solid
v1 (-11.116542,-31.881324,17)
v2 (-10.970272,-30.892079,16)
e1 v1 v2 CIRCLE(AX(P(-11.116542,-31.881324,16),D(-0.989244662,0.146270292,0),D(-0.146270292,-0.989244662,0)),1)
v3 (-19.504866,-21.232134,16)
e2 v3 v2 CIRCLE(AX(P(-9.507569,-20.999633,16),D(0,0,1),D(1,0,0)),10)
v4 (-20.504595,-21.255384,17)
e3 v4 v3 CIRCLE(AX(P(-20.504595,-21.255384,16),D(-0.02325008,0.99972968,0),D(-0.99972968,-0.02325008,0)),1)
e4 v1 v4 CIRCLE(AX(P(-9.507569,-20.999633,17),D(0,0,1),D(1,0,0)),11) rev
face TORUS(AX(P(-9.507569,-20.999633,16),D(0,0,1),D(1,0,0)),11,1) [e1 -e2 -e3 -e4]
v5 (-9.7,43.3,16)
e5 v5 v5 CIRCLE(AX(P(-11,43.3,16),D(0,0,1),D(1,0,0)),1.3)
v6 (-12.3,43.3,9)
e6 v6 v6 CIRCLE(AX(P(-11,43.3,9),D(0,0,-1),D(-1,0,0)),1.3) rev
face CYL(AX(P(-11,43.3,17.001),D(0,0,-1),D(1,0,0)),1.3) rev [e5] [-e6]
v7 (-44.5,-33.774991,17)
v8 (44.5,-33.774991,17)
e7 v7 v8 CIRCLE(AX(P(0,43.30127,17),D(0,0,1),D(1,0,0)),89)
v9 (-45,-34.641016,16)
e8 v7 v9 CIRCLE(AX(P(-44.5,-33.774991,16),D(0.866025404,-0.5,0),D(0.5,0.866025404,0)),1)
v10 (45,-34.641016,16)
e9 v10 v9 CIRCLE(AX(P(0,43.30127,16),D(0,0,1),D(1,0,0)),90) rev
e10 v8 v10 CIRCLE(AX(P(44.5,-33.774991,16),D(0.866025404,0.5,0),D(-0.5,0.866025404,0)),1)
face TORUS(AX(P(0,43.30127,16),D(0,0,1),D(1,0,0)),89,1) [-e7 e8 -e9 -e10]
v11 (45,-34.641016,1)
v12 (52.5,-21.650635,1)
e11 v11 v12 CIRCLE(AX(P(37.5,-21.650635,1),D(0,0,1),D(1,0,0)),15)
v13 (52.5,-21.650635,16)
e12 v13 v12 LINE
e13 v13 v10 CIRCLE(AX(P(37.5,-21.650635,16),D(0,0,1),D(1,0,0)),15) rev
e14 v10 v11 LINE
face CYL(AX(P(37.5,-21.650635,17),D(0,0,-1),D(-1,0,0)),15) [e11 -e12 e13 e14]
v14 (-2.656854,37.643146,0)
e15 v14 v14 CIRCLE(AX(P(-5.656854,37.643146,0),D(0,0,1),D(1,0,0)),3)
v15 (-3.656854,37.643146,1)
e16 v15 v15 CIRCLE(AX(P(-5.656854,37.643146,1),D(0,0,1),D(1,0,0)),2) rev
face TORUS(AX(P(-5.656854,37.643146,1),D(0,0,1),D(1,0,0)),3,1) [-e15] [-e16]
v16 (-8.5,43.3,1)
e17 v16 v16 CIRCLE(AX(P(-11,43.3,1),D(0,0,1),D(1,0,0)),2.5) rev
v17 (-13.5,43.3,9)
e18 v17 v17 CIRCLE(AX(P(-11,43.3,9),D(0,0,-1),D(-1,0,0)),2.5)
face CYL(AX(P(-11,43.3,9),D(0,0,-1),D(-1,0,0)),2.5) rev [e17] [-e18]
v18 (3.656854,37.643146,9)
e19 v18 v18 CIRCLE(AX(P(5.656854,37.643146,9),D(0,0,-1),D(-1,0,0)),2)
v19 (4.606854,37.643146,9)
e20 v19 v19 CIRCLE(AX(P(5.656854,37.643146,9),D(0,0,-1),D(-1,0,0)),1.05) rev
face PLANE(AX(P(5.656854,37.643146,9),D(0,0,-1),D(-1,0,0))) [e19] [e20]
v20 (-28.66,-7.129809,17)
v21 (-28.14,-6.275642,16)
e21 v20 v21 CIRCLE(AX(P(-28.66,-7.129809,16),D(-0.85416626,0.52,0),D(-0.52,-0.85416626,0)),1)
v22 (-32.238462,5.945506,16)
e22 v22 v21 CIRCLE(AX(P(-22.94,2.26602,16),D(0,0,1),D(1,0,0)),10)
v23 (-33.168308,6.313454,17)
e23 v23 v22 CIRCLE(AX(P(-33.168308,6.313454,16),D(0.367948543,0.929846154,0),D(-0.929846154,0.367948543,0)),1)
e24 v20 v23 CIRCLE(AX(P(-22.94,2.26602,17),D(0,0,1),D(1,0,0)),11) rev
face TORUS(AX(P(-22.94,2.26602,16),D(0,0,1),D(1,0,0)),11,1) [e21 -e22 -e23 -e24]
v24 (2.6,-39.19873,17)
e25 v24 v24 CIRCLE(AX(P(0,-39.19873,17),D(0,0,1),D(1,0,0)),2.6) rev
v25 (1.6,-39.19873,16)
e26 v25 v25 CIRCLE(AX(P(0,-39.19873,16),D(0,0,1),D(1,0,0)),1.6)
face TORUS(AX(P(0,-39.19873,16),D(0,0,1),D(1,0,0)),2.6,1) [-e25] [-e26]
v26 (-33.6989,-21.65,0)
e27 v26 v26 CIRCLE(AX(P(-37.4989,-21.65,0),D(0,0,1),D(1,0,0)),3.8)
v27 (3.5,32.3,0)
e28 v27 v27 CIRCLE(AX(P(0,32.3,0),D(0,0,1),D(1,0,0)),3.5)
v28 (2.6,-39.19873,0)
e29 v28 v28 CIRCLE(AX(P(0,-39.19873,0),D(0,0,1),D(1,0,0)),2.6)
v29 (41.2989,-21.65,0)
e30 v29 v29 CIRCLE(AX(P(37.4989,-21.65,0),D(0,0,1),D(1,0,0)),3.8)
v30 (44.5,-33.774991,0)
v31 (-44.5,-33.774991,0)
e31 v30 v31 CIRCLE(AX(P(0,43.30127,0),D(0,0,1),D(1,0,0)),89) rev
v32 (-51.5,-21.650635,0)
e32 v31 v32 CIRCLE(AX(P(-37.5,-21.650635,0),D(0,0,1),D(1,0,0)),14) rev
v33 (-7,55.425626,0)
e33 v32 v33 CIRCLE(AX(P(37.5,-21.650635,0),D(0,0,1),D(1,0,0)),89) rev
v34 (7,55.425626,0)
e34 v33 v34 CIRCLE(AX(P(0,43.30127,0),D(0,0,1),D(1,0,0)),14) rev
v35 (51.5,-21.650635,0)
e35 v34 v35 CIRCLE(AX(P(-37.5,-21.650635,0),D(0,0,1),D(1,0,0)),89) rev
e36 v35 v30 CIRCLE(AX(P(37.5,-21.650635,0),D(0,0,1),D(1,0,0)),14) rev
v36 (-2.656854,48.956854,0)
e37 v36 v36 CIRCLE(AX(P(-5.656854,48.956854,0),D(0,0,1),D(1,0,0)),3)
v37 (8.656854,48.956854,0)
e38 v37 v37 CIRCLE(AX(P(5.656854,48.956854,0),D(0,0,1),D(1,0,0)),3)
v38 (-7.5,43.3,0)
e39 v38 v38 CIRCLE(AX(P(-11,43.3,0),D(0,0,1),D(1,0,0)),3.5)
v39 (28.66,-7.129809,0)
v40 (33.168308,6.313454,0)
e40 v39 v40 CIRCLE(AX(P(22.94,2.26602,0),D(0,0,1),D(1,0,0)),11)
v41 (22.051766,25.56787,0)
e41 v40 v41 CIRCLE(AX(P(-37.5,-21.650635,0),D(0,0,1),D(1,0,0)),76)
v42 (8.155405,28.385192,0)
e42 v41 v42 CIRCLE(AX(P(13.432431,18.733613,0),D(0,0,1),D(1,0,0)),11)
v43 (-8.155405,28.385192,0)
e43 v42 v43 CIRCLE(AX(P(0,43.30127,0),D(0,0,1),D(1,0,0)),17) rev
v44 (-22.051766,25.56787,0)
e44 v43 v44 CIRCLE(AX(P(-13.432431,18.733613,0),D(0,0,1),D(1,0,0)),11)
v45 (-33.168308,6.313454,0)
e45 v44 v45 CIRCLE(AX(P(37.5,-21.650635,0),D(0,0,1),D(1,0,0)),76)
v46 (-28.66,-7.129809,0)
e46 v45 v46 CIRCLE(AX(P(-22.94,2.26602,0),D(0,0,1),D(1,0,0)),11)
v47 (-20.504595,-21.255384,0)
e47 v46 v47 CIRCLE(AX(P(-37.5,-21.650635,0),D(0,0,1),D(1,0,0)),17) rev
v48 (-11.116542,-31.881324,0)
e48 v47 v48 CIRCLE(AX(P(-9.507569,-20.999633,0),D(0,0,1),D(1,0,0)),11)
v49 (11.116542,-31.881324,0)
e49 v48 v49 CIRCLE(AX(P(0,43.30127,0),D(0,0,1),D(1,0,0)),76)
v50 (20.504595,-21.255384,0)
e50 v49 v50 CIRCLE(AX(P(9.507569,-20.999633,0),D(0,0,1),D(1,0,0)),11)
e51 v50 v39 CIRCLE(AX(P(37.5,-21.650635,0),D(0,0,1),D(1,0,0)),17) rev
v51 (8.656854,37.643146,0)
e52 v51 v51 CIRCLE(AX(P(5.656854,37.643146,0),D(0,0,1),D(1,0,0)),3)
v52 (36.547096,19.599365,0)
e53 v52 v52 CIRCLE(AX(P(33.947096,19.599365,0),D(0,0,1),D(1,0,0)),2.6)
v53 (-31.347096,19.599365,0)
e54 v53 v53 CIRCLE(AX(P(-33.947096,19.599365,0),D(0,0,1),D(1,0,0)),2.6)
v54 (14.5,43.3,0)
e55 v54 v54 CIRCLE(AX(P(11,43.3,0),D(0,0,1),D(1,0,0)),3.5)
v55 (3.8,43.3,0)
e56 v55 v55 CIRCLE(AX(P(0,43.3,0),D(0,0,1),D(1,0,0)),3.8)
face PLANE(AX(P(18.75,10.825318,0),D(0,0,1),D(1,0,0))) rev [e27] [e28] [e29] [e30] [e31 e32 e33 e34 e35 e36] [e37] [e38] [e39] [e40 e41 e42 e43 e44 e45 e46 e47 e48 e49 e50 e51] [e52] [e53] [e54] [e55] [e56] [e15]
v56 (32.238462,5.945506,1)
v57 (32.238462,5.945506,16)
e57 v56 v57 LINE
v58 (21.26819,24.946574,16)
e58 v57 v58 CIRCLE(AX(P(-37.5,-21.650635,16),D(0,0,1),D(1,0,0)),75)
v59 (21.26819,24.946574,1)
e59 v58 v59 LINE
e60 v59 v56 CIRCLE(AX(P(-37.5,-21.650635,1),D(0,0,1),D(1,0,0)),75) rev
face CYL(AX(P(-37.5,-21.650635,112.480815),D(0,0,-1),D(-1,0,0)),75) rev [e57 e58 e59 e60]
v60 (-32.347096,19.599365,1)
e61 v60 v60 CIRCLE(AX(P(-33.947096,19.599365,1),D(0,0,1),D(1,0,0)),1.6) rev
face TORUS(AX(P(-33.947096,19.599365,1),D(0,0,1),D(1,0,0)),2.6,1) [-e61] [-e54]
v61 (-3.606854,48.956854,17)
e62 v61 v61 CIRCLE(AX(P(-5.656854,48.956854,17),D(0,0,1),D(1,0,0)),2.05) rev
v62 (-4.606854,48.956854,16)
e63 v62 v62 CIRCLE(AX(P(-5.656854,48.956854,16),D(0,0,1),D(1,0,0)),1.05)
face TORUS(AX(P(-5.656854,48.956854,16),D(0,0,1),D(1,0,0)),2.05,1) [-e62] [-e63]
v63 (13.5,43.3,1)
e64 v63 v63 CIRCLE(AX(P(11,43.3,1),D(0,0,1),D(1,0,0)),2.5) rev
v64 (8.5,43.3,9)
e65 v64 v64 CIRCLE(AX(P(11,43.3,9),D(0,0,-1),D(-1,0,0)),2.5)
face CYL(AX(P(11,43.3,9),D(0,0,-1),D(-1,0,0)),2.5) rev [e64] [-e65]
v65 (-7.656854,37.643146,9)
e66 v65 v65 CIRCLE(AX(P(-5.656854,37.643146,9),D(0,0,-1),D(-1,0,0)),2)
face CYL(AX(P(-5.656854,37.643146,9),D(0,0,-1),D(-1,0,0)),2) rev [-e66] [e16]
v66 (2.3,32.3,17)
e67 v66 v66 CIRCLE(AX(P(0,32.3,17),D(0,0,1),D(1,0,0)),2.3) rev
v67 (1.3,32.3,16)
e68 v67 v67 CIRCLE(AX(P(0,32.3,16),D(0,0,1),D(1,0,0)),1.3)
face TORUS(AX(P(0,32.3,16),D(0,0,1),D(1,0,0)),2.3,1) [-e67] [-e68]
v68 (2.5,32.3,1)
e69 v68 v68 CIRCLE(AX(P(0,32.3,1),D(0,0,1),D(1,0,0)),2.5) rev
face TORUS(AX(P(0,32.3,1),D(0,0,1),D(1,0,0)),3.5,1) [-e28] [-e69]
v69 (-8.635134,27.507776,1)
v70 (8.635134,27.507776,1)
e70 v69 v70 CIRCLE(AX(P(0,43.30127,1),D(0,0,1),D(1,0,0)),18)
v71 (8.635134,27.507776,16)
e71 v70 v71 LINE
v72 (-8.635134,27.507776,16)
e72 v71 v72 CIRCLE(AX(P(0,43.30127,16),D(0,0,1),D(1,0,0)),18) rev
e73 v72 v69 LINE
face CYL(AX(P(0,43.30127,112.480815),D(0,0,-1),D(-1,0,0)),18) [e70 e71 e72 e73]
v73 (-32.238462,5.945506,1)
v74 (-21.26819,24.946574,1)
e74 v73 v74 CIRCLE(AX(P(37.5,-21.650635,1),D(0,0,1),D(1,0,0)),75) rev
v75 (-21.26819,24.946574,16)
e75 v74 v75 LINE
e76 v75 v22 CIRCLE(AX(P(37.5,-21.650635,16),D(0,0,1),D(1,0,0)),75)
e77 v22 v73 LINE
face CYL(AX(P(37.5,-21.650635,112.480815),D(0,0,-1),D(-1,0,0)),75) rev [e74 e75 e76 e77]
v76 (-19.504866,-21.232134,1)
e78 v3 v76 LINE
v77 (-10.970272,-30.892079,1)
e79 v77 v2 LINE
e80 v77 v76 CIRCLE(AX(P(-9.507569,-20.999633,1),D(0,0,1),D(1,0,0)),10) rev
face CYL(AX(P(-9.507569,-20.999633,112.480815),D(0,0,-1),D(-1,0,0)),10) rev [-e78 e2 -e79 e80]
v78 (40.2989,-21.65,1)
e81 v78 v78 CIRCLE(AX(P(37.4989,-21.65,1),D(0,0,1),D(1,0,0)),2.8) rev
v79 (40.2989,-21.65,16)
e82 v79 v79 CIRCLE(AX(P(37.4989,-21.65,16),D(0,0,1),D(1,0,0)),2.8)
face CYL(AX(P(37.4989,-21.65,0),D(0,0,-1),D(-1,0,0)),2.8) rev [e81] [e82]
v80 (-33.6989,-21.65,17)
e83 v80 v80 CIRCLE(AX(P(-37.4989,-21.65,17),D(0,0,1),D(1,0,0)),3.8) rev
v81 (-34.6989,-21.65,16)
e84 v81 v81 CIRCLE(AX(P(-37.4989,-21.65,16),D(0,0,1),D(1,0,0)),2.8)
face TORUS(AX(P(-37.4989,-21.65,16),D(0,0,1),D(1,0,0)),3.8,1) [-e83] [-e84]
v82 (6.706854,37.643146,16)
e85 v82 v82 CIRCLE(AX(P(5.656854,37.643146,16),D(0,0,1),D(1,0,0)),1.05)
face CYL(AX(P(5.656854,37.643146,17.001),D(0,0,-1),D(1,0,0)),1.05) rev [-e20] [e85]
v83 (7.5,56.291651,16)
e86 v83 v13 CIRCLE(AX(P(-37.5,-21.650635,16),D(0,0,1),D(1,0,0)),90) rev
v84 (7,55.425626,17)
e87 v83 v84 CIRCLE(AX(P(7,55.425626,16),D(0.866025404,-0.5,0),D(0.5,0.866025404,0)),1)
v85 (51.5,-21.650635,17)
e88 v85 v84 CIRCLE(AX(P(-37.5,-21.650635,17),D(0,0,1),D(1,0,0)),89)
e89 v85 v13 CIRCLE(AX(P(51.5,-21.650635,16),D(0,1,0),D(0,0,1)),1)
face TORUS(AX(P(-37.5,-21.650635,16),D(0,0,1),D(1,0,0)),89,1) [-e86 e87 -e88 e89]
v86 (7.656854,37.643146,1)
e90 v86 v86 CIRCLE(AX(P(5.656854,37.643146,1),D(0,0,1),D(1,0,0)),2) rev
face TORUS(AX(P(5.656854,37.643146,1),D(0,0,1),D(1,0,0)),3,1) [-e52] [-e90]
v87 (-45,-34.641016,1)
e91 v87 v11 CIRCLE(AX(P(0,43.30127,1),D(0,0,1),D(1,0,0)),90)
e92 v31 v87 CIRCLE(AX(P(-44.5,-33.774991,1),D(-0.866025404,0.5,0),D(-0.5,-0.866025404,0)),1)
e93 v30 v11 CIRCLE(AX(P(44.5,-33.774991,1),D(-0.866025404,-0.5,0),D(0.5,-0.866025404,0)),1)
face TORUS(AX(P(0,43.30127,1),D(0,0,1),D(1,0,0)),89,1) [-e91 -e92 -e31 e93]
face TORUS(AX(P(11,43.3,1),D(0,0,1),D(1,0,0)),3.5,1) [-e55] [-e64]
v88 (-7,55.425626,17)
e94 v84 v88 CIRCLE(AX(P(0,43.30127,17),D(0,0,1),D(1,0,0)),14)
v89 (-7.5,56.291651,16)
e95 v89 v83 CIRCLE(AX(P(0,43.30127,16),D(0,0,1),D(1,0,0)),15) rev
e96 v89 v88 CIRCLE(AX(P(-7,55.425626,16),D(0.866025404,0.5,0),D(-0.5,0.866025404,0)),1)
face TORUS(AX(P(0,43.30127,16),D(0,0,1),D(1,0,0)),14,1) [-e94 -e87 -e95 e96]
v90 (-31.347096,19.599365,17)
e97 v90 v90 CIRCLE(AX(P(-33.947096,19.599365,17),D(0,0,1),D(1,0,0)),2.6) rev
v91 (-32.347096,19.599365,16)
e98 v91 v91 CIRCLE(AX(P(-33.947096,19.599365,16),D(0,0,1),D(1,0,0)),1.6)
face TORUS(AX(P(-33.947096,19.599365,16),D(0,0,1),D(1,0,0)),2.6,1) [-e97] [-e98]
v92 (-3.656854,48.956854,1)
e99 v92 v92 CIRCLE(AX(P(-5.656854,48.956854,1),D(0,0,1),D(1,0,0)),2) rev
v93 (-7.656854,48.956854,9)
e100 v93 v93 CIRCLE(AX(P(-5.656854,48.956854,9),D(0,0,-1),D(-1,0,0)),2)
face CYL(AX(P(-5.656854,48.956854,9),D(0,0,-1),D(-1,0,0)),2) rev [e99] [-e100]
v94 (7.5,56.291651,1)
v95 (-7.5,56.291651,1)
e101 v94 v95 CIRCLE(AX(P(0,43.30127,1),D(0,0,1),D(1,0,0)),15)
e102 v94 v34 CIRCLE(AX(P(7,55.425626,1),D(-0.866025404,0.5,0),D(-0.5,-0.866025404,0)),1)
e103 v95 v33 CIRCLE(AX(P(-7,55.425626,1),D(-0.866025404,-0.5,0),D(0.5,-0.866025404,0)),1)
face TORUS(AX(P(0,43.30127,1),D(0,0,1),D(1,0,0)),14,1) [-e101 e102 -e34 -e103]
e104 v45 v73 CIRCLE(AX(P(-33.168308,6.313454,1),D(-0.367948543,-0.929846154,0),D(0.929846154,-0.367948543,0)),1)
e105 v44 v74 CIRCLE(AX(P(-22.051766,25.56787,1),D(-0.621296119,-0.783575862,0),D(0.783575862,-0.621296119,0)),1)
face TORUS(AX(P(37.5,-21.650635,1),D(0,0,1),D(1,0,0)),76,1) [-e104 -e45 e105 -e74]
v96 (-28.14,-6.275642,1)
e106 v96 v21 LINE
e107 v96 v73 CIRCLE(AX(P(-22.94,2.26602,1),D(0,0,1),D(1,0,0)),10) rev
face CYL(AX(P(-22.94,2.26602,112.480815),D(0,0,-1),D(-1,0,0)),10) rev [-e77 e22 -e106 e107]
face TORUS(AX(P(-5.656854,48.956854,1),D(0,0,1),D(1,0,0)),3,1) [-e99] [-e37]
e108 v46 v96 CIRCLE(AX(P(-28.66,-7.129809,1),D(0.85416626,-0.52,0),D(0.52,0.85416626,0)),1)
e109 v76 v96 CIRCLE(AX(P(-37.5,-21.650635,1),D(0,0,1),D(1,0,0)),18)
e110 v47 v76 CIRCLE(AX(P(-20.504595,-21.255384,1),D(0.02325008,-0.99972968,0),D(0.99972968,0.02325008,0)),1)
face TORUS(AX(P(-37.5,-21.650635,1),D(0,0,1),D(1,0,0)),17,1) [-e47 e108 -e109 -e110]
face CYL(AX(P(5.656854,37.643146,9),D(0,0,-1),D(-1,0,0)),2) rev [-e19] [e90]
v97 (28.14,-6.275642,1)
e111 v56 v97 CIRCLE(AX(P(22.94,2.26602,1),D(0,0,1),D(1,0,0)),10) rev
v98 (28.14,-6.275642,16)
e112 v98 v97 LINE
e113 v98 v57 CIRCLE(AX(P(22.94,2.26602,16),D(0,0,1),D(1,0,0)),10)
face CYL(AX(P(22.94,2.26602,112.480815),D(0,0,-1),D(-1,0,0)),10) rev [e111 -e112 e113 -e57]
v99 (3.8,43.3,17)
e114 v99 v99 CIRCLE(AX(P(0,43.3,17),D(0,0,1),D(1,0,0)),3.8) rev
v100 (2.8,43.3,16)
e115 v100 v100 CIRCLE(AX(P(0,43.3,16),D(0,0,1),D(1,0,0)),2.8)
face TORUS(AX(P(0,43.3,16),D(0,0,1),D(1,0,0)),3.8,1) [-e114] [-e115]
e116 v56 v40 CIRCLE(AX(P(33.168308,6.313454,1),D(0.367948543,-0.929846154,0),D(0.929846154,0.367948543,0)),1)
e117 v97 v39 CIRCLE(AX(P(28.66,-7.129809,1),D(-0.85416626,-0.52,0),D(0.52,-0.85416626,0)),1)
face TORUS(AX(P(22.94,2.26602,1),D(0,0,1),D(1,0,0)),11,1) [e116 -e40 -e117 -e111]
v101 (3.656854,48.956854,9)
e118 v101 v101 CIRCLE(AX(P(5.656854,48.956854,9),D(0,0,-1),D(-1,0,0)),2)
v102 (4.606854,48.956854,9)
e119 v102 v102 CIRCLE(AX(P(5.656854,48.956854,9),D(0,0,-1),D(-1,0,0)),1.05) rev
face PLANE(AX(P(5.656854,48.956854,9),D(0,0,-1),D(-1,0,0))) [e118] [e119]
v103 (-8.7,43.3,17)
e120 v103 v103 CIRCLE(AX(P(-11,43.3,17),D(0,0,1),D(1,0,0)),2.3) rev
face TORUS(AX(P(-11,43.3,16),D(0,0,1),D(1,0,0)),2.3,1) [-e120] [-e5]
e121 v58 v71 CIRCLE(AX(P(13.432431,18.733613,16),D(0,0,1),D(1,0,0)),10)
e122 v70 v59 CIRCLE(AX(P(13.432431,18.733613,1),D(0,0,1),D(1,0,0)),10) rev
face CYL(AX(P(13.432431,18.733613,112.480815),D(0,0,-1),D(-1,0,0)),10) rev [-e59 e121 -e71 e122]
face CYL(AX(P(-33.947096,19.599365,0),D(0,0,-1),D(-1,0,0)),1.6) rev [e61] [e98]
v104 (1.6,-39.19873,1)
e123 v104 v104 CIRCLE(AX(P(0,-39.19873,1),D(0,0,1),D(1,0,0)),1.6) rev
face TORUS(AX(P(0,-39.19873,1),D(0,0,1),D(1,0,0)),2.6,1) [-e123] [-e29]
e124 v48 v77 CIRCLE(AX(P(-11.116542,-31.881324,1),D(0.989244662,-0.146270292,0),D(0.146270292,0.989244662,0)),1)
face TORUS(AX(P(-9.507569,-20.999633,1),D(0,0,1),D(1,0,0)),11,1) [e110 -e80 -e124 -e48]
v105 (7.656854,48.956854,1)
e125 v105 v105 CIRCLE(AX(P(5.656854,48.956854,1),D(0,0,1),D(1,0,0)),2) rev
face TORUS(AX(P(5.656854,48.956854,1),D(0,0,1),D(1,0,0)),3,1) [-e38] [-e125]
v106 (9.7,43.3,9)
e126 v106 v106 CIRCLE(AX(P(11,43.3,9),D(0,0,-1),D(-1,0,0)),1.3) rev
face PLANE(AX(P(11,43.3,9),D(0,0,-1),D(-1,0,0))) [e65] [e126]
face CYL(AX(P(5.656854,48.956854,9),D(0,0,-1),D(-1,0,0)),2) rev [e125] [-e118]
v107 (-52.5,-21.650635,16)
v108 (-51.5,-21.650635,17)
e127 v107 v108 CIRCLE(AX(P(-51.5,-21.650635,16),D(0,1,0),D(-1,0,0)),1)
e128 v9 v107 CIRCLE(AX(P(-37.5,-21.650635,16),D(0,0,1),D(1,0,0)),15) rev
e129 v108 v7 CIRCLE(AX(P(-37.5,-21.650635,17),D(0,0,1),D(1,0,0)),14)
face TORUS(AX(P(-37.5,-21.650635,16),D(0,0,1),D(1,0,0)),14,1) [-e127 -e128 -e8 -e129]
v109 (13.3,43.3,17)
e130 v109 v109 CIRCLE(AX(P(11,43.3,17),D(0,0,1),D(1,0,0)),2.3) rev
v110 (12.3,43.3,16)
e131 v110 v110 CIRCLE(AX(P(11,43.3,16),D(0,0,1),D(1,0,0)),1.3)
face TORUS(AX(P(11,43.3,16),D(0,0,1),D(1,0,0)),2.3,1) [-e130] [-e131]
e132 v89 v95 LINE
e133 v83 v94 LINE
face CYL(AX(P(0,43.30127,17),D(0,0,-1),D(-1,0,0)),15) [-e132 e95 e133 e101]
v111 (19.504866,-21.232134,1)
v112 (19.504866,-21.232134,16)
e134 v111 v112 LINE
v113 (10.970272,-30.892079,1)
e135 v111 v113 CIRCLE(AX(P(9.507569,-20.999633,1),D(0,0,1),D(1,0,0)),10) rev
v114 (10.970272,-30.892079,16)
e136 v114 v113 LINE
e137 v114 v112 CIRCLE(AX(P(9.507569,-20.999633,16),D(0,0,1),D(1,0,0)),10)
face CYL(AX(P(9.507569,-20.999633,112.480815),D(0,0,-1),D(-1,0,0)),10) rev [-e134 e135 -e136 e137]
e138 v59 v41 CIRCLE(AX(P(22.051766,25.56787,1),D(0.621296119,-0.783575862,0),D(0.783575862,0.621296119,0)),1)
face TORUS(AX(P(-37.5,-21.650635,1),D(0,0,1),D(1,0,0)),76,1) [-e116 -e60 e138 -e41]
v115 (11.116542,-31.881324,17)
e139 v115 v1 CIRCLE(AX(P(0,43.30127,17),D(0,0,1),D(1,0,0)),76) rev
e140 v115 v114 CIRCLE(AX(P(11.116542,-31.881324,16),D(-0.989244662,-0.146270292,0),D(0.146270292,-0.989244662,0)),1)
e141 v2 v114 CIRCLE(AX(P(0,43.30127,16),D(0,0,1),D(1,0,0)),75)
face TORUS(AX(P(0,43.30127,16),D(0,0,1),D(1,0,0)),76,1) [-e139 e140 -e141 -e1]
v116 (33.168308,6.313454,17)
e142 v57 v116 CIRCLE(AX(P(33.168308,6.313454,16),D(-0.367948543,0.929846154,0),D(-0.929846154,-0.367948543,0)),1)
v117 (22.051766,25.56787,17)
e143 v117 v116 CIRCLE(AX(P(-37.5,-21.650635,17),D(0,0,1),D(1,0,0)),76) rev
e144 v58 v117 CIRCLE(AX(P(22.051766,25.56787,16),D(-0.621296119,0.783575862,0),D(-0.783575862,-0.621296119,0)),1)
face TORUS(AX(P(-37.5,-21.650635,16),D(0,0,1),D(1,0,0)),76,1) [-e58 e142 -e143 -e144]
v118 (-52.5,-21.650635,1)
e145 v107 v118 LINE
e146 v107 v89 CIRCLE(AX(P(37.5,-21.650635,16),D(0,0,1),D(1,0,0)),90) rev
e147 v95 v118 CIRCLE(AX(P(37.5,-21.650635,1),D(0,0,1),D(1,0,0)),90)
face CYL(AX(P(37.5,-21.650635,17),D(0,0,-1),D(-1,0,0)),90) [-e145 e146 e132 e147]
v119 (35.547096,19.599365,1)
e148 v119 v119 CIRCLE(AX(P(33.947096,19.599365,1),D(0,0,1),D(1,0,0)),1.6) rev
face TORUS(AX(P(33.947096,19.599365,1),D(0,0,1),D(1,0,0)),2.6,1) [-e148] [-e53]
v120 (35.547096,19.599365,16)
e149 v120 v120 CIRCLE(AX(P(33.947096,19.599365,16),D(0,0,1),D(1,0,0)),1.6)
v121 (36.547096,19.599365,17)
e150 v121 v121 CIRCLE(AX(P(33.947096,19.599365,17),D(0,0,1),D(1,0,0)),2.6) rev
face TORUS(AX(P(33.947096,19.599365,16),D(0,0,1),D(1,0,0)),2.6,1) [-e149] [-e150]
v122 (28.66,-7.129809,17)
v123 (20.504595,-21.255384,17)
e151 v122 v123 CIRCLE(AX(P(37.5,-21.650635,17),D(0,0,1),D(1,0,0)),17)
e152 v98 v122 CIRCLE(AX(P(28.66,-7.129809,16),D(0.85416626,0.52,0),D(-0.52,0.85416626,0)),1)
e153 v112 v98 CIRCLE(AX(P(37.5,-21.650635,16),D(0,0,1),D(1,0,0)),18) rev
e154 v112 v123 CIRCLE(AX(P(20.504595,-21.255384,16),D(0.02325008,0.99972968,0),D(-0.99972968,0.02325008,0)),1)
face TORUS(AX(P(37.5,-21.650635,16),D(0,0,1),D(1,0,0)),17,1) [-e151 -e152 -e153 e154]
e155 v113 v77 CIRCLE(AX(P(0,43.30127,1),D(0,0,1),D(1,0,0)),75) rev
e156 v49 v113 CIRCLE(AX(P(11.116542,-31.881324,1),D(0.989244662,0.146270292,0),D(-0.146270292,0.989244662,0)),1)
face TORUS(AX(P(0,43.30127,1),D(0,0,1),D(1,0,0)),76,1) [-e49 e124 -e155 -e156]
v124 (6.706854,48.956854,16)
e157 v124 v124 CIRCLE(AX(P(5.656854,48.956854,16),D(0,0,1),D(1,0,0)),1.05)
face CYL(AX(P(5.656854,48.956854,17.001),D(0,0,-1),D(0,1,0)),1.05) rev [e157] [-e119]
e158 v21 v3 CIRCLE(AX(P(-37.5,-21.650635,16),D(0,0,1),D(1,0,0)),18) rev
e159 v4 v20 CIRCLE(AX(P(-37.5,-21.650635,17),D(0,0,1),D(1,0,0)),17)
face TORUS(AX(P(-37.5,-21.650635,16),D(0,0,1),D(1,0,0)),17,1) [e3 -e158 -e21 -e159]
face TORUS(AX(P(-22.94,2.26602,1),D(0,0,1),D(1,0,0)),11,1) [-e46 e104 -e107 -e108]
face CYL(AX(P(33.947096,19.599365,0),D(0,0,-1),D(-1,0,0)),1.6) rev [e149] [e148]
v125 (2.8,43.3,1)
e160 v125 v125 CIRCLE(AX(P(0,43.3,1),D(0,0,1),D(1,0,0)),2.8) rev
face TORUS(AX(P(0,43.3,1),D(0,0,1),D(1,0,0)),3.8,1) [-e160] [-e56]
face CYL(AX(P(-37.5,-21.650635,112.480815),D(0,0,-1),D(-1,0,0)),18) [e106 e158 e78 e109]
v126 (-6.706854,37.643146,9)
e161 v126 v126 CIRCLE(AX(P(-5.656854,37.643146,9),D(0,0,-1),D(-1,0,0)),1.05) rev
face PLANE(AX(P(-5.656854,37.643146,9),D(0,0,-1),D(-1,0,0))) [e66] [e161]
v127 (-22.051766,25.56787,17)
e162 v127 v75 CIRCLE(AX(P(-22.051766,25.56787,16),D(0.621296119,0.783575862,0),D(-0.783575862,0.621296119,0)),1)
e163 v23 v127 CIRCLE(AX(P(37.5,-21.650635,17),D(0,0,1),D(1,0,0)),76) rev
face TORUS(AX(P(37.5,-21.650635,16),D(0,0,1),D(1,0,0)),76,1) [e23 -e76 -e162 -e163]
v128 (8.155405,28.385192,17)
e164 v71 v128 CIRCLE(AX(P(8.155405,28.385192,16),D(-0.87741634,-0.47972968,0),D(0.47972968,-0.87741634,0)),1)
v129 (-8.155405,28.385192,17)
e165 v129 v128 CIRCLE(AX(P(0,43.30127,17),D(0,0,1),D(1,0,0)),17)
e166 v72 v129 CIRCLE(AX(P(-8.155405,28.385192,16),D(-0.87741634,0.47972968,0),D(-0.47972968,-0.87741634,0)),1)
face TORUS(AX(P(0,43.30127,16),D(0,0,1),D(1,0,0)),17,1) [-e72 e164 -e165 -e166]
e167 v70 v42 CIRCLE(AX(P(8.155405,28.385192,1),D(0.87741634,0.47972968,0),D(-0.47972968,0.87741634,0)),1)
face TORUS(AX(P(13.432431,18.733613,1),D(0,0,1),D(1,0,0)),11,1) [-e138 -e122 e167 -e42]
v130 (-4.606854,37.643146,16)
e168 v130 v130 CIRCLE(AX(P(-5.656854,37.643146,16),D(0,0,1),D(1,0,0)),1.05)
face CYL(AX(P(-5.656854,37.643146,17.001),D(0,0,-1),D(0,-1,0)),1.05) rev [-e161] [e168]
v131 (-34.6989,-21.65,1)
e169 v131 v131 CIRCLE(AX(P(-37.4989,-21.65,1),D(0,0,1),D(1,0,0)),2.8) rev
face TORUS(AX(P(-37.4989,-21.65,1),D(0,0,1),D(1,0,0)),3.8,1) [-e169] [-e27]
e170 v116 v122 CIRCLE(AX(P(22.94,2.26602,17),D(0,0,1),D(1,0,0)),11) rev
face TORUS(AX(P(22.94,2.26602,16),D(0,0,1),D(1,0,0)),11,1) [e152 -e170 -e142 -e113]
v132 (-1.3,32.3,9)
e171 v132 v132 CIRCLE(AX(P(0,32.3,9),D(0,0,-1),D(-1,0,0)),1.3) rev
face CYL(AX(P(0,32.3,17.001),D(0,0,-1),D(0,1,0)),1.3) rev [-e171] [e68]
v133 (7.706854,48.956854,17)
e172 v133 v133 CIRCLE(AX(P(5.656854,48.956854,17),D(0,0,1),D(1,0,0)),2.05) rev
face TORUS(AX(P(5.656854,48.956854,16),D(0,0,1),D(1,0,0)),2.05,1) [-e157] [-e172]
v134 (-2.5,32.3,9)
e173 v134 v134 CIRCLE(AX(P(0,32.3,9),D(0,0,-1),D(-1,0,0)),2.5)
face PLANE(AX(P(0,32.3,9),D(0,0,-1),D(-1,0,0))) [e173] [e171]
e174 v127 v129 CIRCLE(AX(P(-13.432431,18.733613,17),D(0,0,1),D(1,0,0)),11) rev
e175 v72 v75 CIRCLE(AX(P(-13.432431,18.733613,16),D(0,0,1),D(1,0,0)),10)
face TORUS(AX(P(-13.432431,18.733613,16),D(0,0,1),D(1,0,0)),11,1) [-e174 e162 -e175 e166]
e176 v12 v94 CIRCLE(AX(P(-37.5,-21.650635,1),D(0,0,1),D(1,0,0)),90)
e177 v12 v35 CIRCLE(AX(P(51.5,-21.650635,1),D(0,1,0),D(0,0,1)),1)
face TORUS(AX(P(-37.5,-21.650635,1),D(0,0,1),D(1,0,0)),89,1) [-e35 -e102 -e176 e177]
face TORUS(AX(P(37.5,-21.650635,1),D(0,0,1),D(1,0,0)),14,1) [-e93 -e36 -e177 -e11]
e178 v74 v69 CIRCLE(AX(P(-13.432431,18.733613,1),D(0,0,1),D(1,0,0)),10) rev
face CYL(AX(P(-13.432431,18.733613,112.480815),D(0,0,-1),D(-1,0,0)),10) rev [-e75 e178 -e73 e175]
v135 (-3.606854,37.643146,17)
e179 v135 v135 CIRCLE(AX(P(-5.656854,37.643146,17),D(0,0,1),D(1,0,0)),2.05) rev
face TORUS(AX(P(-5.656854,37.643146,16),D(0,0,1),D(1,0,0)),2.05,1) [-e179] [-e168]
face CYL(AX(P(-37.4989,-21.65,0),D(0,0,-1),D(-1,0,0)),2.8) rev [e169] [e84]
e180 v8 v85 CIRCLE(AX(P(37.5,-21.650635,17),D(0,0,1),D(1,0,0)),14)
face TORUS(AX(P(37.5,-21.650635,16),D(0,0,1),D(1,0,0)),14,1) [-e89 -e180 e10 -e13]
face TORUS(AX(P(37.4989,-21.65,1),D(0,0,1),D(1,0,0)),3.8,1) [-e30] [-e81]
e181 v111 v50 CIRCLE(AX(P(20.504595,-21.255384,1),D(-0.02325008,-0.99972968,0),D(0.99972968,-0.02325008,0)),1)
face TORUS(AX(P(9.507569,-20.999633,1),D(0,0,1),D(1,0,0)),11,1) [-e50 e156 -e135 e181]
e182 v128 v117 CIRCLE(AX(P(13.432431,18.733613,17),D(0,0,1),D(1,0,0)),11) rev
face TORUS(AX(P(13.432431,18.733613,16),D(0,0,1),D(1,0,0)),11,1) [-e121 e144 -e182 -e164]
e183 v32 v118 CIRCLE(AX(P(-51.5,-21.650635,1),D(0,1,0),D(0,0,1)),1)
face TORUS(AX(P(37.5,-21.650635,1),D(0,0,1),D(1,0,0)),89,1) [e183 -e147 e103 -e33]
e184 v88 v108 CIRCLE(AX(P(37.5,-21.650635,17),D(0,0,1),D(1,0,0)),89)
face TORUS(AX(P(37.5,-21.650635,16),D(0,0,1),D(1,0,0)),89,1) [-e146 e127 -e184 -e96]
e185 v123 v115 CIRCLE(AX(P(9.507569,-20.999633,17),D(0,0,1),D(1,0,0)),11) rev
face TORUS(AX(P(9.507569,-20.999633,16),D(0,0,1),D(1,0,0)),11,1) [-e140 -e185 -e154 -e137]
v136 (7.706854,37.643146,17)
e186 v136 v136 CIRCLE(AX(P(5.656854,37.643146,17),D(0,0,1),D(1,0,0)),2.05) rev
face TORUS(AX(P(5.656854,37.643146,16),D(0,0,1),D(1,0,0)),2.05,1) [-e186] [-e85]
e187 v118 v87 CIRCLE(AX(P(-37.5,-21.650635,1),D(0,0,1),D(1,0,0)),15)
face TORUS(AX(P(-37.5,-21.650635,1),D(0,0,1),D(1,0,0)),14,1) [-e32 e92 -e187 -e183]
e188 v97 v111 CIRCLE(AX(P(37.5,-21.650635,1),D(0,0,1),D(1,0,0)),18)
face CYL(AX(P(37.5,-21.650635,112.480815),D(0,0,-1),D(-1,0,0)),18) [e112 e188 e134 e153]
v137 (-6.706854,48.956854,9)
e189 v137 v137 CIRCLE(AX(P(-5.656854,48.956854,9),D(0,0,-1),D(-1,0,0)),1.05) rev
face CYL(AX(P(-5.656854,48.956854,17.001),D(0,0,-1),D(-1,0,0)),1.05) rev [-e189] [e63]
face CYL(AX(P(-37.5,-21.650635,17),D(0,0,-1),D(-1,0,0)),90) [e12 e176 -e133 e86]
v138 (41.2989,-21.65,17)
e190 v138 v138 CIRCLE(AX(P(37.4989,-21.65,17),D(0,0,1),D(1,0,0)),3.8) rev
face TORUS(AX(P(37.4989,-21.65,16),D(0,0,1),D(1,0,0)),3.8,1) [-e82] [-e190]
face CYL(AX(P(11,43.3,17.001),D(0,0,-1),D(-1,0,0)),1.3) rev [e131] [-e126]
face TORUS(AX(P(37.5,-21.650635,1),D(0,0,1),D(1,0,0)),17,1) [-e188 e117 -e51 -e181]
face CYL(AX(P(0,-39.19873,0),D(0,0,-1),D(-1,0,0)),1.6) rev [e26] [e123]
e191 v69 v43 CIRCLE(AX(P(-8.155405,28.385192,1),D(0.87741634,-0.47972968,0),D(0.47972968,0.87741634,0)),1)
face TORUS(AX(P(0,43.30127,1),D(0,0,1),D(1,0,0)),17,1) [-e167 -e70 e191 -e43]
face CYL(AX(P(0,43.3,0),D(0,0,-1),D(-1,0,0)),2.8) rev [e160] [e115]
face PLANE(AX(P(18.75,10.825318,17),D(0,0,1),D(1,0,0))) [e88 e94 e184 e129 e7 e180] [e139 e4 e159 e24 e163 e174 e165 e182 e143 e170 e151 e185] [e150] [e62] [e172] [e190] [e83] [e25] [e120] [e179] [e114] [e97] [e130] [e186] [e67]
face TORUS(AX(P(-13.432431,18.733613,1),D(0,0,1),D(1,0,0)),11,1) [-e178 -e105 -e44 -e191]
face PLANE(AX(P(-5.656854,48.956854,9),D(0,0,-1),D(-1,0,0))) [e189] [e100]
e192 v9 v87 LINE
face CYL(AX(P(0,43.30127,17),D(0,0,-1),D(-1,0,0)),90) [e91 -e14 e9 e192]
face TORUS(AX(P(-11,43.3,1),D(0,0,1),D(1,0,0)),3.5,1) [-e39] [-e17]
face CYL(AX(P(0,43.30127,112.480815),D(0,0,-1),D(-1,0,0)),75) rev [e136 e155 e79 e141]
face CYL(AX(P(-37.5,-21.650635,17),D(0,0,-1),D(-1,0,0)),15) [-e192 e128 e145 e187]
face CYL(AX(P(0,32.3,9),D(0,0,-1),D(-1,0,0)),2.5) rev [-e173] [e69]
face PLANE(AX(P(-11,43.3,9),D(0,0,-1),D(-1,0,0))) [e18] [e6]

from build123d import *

# Parameters (mm, degrees)
BOSS_EXTRUDE1_DEPTH        = 17
CUT_EXTRUDE2_DEPTH         = 17
F_5_6_5_6_DIAMETER_HOLE1_D = 5.6
F_3_2_3_2_DIAMETER_HOLE1_D = 3.2
CIRPATTERN1_COUNT          = 3
CIRPATTERN2_COUNT          = 3
CUT_EXTRUDE3_REACH         = 82.276
SKETCH8_R                  = 1.05
SKETCH8_R_2                = 1.3
CIRPATTERN3_OUTLINE_R      = 1.3
CIRPATTERN3_DEPTH          = 17
CIRPATTERN5_OUTLINE_R      = 1.05
CIRPATTERN5_DEPTH          = 17
SKETCH9_R                  = 2
SKETCH9_R_2                = 2.5
CUT_EXTRUDE5_DEPTH         = 9
FILLET3_R                  = 10
FILLET2_R                  = 1


# Read off the part's stored shape, not the designer's step: CirPattern3, CirPattern5
with BuildPart() as part:
    # Sketch1 → Boss-Extrude1 (new body)
    with BuildSketch(Plane.XY):
        with BuildLine():
            ThreePointArc((-7.5, 56.291651246), (-40.442286341, 23.349364905), (-52.5, -21.650635095))
            ThreePointArc((-52.5, -21.650635095), (-50.490381057, -29.150635095), (-45, -34.641016151))
            ThreePointArc((-45, -34.641016151), (0, -46.698729811), (45, -34.641016151))
            ThreePointArc((45, -34.641016151), (50.490381057, -29.150635095), (52.5, -21.650635095))
            ThreePointArc((52.5, -21.650635095), (40.442286341, 23.349364905), (7.5, 56.291651246))
            ThreePointArc((7.5, 56.291651246), (0, 58.301270189), (-7.5, 56.291651246))
        make_face()
    extrude(amount=BOSS_EXTRUDE1_DEPTH)

    # Sketch3 → Cut-Extrude2 (cut)
    with BuildSketch(Plane.XY):
        with BuildLine():
            ThreePointArc((14.395813387, 32.495690292), (0, 25.301270189), (-14.395813387, 32.495690292))
            ThreePointArc((-14.395813387, 32.495690292), (-27.451905284, 15.849364905), (-35.34, -3.780705044))
            ThreePointArc((-35.34, -3.780705044), (-21.911542732, -12.650635095), (-20.944186613, -28.714985248))
            ThreePointArc((-20.944186613, -28.714985248), (0, -31.698729811), (20.944186613, -28.714985248))
            ThreePointArc((20.944186613, -28.714985248), (21.911542732, -12.650635095), (35.34, -3.780705044))
            ThreePointArc((35.34, -3.780705044), (27.451905284, 15.849364905), (14.395813387, 32.495690292))
        make_face()
    extrude(amount=CUT_EXTRUDE2_DEPTH, mode=Mode.SUBTRACT)

    # Ø5.6 (5.6) Diameter Hole1 (through all)
    with Locations(Plane(origin=(0, 0, 0), x_dir=(-1, 0, 0), z_dir=(0, 0, -1))):
        with Locations((-37.498899984, -21.65)):
            f_5_6_5_6_diameter_hole1 = Hole(F_5_6_5_6_DIAMETER_HOLE1_D / 2)

    # Ø3.2 (3.2) Diameter Hole1 (through all)
    with Locations(Plane(origin=(0, 0, 0), x_dir=(-1, 0, 0), z_dir=(0, 0, -1))):
        with Locations((0, -39.198729811)):
            f_3_2_3_2_diameter_hole1 = Hole(F_3_2_3_2_DIAMETER_HOLE1_D / 2)

    # CirPattern1: Ø3.2 (3.2) Diameter Hole1 ×3 about axis
    cirpattern1_axis = Axis((0, 0, 0), (0, 0, 1))
    for i in range(1, CIRPATTERN1_COUNT):
        add(f_3_2_3_2_diameter_hole1.rotate(cirpattern1_axis, i * 360 / CIRPATTERN1_COUNT), mode=Mode.SUBTRACT)

    # CirPattern2: Ø5.6 (5.6) Diameter Hole1 ×3 about axis
    cirpattern2_axis = Axis((0, 0, 0), (0, 0, 1))
    for i in range(1, CIRPATTERN2_COUNT):
        add(f_5_6_5_6_diameter_hole1.rotate(cirpattern2_axis, i * 360 / CIRPATTERN2_COUNT), mode=Mode.SUBTRACT)

    # Sketch8 → Cut-Extrude3 (cut, up to next)
    with BuildSketch(Plane(origin=(0, 0, 0), x_dir=(-1, 0, 0), z_dir=(0, 0, -1)), mode=Mode.PRIVATE) as cut_extrude3_sk1:
        with Locations((5.656854249, 48.956854249)):
            Circle(SKETCH8_R)
    cut_extrude3_tool1 = extrude(cut_extrude3_sk1.sketch, amount=-CUT_EXTRUDE3_REACH, mode=Mode.PRIVATE) & part.part
    # Sketch8 → Cut-Extrude3 (cut, up to next)
    with BuildSketch(Plane(origin=(0, 0, 0), x_dir=(-1, 0, 0), z_dir=(0, 0, -1)), mode=Mode.PRIVATE) as cut_extrude3_sk2:
        with Locations((-11, 43.3)):
            Circle(SKETCH8_R_2)
    cut_extrude3_tool2 = extrude(cut_extrude3_sk2.sketch, amount=-CUT_EXTRUDE3_REACH, mode=Mode.PRIVATE) & part.part
    add(cut_extrude3_tool1.solids().sort_by_distance((-5.656854, 48.956854, 0))[0], mode=Mode.SUBTRACT)
    add(cut_extrude3_tool2.solids().sort_by_distance((11, 43.3, 0))[0], mode=Mode.SUBTRACT)

    # CirPattern3 outline → CirPattern3 (cut)
    with BuildSketch(Plane.XY):
        with Locations((0, 32.3)):
            Circle(CIRPATTERN3_OUTLINE_R)
        with Locations((-11, 43.3)):
            Circle(CIRPATTERN3_OUTLINE_R)
    extrude(amount=CIRPATTERN3_DEPTH, mode=Mode.SUBTRACT)

    # CirPattern5 outline → CirPattern5 (cut)
    with BuildSketch(Plane.XY):
        with Locations((5.656854249, 48.956854249)):
            Circle(CIRPATTERN5_OUTLINE_R)
        with Locations((5.656854249, 37.643145751)):
            Circle(CIRPATTERN5_OUTLINE_R)
        with Locations((-5.656854249, 37.643145751)):
            Circle(CIRPATTERN5_OUTLINE_R)
    extrude(amount=CIRPATTERN5_DEPTH, mode=Mode.SUBTRACT)

    # Sketch9 → Cut-Extrude5 (cut)
    with BuildSketch(Plane(origin=(0, 0, 0), x_dir=(-1, 0, 0), z_dir=(0, 0, -1))):
        with Locations((-5.656854249, 37.643145751)):
            Circle(SKETCH9_R)
        with Locations((-5.656854249, 48.956854249)):
            Circle(SKETCH9_R)
        with Locations((5.656854249, 48.956854249)):
            Circle(SKETCH9_R)
        with Locations((5.656854249, 37.643145751)):
            Circle(SKETCH9_R)
        with Locations((0, 32.3)):
            Circle(SKETCH9_R_2)
        with Locations((-11, 43.3)):
            Circle(SKETCH9_R_2)
        with Locations((11, 43.3)):
            Circle(SKETCH9_R_2)
    extrude(amount=-CUT_EXTRUDE5_DEPTH, mode=Mode.SUBTRACT)

    # Fillet3
    fillet3_edges = [part.edges().sort_by_distance(p)[0] for p in [
        (35.34, -3.780705044, 8.5),
        (14.395813387, 32.495690292, 8.5),
        (-14.395813387, 32.495690292, 8.5),
        (-35.34, -3.780705044, 8.5),
        (-20.944186613, -28.714985248, 8.5),
        (20.944186613, -28.714985248, 8.5),
    ]]
    fillet(fillet3_edges, radius=FILLET3_R)

    # Fillet2
    fillet2_edges = [part.edges().sort_by_distance(p)[0] for p in [
        (-50.490381057, -29.150635095, 17),
        (-3.656854249, 48.956854249, 0),
        (-3.656854249, 37.643145751, 0),
        (2.5, 32.3, 0),
        (13.5, 43.3, 0),
        (-8.5, 43.3, 0),
        (7.656854249, 37.643145751, 0),
        (0, -46.698729811, 17),
        (21.911542732, -12.650635095, 17),
        (21.911542732, -12.650635095, 0),
        (27.451905284, 15.849364905, 17),
        (27.451905284, 15.849364905, 0),
        (0, -31.698729811, 17),
        (0, -31.698729811, 0),
        (-21.911542732, -12.650635095, 17),
        (-21.911542732, -12.650635095, 0),
        (-27.451905284, 15.849364905, 17),
        (-27.451905284, 15.849364905, 0),
        (0, 25.301270189, 17),
        (0, 25.301270189, 0),
        (32.421058039, -0.913529851, 0),
        (32.421058039, -0.913529851, 17),
        (17.001669077, -27.620694954, 0),
        (17.001669077, -27.620694954, 17),
        (-17.001669077, -27.620694954, 0),
        (-17.001669077, -27.620694954, 17),
        (-32.421058039, -0.913529851, 0),
        (-32.421058039, -0.913529851, 17),
        (-15.419388962, 28.534224805, 0),
        (-15.419388962, 28.534224805, 17),
        (15.419388962, 28.534224805, 0),
        (15.419388962, 28.534224805, 17),
        (50.490381057, -29.150635095, 17),
        (40.442286341, 23.349364905, 17),
        (0, 58.301270189, 17),
        (34.698899984, -21.65, 0),
        (34.698899984, -21.65, 17),
        (-1.6, -39.198729811, 0),
        (-1.6, -39.198729811, 17),
        (34.747095812, 18.213724259, 0),
        (34.747095812, 18.213724259, 17),
        (-33.147095812, 20.985005552, 0),
        (-33.147095812, 20.985005552, 17),
        (40.442286341, 23.349364905, 0),
        (1.4, 40.87512887, 0),
        (1.4, 40.87512887, 17),
        (50.490381057, -29.150635095, 0),
        (-36.098899984, -19.22512887, 0),
        (-36.098899984, -19.22512887, 17),
        (0, -46.698729811, 0),
        (-40.442286341, 23.349364905, 17),
        (-50.490381057, -29.150635095, 0),
        (-4.606854249, 48.956854249, 17),
        (12.3, 43.3, 17),
        (-40.442286341, 23.349364905, 0),
        (-12.3, 43.3, 17),
        (0, 58.301270189, 0),
        (-1.3, 32.3, 17),
        (-6.706854249, 37.643145751, 17),
        (4.606854249, 37.643145751, 17),
        (4.606854249, 48.956854249, 17),
        (7.656854249, 48.956854249, 0),
    ]]
    fillet(fillet2_edges, radius=FILLET2_R)


solid = part.part
